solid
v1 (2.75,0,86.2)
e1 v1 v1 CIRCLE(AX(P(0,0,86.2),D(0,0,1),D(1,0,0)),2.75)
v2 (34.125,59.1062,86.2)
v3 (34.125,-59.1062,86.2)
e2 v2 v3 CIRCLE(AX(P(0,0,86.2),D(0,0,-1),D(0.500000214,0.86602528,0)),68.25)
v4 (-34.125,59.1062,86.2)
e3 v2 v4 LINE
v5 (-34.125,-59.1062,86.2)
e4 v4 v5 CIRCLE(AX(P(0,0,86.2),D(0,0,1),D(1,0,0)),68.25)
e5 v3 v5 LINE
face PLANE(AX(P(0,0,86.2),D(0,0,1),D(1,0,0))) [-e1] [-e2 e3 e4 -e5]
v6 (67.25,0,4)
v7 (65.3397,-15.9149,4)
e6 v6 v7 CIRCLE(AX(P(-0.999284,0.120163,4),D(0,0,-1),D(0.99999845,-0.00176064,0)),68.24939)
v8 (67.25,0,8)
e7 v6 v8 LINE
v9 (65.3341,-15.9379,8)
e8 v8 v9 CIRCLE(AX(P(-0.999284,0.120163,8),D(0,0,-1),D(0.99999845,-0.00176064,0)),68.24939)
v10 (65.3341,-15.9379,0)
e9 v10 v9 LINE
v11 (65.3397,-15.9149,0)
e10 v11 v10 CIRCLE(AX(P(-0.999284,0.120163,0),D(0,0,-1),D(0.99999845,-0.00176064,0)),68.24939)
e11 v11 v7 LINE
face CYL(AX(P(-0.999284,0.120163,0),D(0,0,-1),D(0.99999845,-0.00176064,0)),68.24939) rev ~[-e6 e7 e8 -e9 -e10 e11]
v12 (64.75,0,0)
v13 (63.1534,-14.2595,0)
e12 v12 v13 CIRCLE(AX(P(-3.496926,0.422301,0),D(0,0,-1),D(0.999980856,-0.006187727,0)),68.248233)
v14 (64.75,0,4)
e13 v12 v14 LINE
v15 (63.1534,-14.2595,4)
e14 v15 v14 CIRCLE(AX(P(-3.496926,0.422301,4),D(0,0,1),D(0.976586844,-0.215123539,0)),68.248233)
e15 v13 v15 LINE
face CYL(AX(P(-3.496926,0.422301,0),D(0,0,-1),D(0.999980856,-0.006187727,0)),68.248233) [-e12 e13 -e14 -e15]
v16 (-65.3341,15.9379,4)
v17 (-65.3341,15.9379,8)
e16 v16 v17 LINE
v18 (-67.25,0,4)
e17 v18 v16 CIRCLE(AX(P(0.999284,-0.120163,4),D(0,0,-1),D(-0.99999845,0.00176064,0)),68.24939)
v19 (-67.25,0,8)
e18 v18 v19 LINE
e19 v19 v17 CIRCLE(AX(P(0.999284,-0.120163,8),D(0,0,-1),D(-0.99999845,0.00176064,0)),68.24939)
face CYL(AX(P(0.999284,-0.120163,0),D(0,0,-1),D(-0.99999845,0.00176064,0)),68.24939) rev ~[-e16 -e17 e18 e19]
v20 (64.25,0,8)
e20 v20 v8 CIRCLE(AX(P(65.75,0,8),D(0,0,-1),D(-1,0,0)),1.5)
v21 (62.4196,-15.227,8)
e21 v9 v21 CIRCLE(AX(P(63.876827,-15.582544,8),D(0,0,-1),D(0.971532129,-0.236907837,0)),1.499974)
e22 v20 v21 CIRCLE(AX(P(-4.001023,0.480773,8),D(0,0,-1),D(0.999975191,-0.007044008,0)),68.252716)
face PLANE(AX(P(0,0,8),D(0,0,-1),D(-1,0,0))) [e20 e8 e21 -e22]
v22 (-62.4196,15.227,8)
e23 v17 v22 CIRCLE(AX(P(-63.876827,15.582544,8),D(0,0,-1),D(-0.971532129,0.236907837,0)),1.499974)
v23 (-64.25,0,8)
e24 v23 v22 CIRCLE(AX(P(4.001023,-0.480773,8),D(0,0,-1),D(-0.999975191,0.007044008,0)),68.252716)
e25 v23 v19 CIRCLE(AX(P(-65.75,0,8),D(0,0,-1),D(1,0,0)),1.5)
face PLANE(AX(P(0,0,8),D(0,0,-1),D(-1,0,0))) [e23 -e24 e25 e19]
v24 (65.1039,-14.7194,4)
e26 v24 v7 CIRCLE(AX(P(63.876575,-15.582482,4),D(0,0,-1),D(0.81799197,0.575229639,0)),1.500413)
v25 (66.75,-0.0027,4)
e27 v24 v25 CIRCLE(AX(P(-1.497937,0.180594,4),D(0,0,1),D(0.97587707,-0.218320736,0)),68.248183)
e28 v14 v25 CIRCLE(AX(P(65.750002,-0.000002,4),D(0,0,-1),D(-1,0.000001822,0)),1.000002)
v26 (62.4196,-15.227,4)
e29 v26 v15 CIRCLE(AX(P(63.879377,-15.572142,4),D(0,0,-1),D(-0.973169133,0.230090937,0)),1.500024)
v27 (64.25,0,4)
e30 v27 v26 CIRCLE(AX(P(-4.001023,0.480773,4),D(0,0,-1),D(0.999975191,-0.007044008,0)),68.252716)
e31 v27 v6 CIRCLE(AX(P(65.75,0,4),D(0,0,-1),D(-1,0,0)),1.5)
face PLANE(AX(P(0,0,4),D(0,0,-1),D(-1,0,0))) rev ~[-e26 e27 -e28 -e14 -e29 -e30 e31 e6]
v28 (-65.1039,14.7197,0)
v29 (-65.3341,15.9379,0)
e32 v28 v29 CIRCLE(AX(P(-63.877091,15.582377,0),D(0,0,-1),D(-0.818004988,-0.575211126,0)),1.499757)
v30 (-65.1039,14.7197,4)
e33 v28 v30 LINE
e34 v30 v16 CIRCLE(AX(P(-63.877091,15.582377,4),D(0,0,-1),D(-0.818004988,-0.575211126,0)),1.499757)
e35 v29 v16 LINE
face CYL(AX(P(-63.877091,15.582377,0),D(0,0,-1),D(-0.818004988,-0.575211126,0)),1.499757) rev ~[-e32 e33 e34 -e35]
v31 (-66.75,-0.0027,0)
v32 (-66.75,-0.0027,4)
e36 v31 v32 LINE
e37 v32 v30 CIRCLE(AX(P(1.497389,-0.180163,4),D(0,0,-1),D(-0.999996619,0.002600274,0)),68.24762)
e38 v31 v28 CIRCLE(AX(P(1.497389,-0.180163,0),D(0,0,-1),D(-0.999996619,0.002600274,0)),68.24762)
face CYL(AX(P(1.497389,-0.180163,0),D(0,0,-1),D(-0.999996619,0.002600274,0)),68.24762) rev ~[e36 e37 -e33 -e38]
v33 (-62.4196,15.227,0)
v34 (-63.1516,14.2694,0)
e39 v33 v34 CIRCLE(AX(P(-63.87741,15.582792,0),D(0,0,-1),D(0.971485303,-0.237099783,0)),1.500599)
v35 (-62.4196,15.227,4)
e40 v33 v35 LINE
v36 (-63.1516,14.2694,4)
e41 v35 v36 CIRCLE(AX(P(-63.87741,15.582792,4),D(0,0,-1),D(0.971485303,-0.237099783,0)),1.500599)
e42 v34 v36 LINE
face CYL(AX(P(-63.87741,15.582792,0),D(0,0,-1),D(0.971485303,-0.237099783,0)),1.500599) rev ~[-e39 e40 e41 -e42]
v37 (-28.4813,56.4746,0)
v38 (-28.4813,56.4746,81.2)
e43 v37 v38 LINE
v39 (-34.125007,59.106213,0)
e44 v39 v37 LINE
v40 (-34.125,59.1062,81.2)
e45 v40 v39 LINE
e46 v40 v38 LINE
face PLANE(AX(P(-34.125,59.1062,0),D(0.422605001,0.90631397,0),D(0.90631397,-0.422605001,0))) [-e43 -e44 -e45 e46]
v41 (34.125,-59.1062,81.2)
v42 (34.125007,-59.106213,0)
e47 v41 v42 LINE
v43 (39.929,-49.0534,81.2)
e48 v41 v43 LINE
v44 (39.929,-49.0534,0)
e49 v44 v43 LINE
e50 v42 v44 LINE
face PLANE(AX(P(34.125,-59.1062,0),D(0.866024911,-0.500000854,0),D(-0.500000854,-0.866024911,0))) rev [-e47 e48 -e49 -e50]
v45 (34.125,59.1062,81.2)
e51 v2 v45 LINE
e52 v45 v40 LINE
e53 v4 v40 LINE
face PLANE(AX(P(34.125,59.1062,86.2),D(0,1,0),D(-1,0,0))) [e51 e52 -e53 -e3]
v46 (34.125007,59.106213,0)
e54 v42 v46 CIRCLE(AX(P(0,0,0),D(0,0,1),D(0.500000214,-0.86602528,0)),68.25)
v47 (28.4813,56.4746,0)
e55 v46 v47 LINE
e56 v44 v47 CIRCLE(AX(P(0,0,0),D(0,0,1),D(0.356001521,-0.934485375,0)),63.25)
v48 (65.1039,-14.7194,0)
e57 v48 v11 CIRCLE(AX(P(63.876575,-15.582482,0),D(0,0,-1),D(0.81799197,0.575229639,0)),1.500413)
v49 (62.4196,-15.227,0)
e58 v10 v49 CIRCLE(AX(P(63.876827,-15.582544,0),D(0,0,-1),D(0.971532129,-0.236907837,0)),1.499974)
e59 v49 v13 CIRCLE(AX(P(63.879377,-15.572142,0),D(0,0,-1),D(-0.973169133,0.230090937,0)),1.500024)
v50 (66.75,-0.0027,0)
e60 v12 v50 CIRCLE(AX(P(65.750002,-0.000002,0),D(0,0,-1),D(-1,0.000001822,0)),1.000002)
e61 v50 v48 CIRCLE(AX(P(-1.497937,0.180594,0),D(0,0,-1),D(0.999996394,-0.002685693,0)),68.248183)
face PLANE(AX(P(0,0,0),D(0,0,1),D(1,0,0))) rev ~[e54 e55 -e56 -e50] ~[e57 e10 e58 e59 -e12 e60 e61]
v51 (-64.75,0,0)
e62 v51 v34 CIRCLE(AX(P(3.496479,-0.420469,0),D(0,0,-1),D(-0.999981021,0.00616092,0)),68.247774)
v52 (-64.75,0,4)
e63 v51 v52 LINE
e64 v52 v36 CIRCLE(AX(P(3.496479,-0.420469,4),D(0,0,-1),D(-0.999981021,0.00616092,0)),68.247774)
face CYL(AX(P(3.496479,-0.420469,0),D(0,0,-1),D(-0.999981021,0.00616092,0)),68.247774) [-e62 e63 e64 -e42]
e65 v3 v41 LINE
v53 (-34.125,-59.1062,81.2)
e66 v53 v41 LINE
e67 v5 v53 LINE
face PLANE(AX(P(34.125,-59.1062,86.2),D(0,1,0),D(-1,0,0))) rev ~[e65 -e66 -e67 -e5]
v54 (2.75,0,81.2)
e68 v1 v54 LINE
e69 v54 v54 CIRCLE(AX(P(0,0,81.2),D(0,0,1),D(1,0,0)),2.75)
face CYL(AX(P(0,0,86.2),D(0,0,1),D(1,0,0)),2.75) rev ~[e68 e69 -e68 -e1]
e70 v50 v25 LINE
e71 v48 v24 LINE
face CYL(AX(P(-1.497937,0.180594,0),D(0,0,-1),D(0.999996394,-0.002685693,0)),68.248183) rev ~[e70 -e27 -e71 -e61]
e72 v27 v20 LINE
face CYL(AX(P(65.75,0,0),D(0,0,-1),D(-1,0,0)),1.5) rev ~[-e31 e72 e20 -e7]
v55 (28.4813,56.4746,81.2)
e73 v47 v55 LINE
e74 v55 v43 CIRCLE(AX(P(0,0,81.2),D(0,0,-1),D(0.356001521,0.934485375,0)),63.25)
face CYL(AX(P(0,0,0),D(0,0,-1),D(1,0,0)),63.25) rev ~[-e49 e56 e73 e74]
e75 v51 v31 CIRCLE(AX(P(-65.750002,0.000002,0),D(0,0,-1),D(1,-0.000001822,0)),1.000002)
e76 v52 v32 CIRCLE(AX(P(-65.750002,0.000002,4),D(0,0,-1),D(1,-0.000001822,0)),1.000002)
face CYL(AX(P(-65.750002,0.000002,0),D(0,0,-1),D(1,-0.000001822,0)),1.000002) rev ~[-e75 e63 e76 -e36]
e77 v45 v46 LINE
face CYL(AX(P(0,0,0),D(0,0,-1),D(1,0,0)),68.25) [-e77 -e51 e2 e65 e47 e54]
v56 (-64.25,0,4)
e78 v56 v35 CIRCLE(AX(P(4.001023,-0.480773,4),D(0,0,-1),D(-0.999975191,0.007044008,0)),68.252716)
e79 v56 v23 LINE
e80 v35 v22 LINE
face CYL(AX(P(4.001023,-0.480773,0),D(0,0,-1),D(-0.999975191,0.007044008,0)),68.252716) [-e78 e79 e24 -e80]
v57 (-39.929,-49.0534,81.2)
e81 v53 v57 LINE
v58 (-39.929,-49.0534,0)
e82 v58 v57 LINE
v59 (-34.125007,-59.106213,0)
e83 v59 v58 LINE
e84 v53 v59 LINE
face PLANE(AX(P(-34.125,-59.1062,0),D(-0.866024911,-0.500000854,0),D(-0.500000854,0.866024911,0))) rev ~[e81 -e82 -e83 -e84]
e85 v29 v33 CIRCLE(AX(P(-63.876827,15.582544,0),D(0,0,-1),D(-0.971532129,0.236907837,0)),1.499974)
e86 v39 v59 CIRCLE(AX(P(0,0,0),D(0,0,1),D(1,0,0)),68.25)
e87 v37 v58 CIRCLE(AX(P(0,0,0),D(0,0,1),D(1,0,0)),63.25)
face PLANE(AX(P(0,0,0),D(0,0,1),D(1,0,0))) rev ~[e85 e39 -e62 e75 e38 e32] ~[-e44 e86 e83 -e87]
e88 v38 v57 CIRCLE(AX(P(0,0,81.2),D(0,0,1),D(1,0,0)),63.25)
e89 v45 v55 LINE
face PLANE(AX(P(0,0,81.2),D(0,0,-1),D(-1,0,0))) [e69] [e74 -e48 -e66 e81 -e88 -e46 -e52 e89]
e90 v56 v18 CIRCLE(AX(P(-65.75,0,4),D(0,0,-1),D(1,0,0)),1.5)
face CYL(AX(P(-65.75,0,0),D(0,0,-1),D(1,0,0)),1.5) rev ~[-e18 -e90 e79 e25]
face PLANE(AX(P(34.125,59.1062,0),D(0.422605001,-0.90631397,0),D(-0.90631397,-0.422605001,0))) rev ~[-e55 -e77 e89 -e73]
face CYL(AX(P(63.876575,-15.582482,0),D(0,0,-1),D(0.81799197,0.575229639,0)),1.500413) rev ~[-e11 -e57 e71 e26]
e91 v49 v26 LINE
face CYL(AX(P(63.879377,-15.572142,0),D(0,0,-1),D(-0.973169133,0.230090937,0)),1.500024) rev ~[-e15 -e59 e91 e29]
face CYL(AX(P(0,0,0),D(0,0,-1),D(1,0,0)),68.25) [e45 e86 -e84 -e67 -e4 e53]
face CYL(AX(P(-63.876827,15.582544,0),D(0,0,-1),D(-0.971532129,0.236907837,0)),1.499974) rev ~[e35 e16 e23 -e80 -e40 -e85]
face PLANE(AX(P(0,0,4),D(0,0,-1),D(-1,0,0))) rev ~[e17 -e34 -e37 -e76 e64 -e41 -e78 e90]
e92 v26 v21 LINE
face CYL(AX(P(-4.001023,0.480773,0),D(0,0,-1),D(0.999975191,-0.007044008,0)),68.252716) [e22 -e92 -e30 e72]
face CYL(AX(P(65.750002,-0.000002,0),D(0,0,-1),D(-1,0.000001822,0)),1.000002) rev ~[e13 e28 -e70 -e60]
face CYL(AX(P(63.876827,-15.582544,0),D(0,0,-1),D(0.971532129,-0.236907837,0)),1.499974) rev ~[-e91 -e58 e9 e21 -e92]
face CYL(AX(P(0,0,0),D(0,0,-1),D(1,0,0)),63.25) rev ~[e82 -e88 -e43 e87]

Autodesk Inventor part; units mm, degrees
ref_plane "YZ Plane" through (0, 0, 0) normal (1, 0, 0) x (0, 1, 0)
ref_plane "XZ Plane" through (0, 0, 0) normal (0, 1, 0) x (-1, 0, 0)
ref_plane "XY Plane" through (0, 0, 0) normal (0, 0, 1) x (1, 0, 0)
sketch "Sketch1" plane through (0, 0, 0) normal (0, 0, 1) x (1, 0, 0)
  circle A0 centre (0, 0) radius 63.25
  circle A1 centre (0, 0) radius 68.25
  dimension "d0" = 126.5
  dimension "d1" = 5
extrude "Extrusion1" add sketch "Sketch1" along normal blind 81.2
sketch "Sketch2" plane through (0, 0, 81.2) normal (0, 0, 1) x (1, 0, 0)
  circle A0 centre (0, 0) radius 68.25
extrude "Extrusion2" add sketch "Sketch2" along normal blind 5
sketch "Sketch3" plane through (0, 0, 86.2) normal (0, 0, 1) x (1, 0, 0)
  circle A0 centre (0, 0) radius 2.75
  dimension "d6" = 5.5
extrude "Extrusion3" cut sketch "Sketch3" against normal blind 5
sketch "Sketch4" plane through (0, 0, 86.2) normal (0, 0, 1) x (1, 0, 0)
  line L0 (0, 0) -> (-34.125, 59.1062)
  circle A0 centre (0, 0) radius 68.25 projected
  line L1 (0, 0) -> (68.25, 0) construction
  circle A1 centre (0, 0) radius 2.75 projected
  line L2 (0, 0) -> (34.125, 59.1062)
  line L3 (34.125, 59.1062) -> (-34.125, 59.1062)
  line L4 (0, 0) -> (-34.125, -59.1062)
  circle A2 centre (0, 0) radius 68.25 projected
  line L5 (0, 0) -> (68.25, 0) construction
  line L6 (0, 0) -> (34.125, -59.1062)
  line L7 (0, 0) -> (68.25, 0) construction
  line L8 (34.125, -59.1062) -> (-34.125, -59.1062)
  dimension "d9" = 120
  dimension "d15" = 120
  dimension "d16" = 60
extrude "Extrusion4" cut sketch "Sketch4" against normal through all contours A0 L3 | L8 A0
sketch "Sketch5" plane through (0, 0, 0) normal (0, 0, -1) x (-1, 0, 0)
  line L0 (-34.125, 59.1062) -> (34.125, 59.1062) projected
  line L1 (34.125, 59.1062) -> (28.4813, 56.4746)
  arc A0 (-22.517, 59.1062) -> (22.517, 59.1062) centre (0, 0) ccw projected
  line L2 (34.125, 59.1062) -> (40.3521, 59.1062) construction
  line L3 (0, 0) -> (0, 13.3987)
  line L4 (-34.125, 59.1062) -> (-28.4813, 56.4746)
  arc A1 (-22.517, 59.1062) -> (-28.4813, 56.4746) centre (0, 0) ccw
  line L5 (-34.125, 59.1062) -> (-22.517, 59.1062)
  dimension "d12" = 155
extrude "Extrusion5" cut sketch "Sketch5" against normal blind 81.2 contours L0 A0 L4 | L0 L1 A0
sketch "Sketch6" plane through (-34.125, 59.1062, 86.2) normal (0, 1, 0) x (1, 0, 0)
  point P0 (34.125, 86.2)
sketch "Sketch7" plane through (0, 0, 0) normal (0, 0, -1) x (-1, 0, 0)
  arc A0 (34.125, -59.1062) -> (34.125, 59.1062) centre (0, 0) ccw projected
  line L0 (34.125, 59.1062) -> (28.4813, 56.4746) projected
  arc A1 (22.517, -59.1062) -> (28.4813, 56.4746) centre (0, 0) ccw projected
  line L1 (22.517, -59.1062) -> (34.125, -59.1062) projected
  arc A2 (34.125, -59.1062) -> (34.125, 59.1062) centre (0, 0) ccw projected
  line L2 (-28.4813, 56.4746) -> (-34.125, 59.1062) projected
  arc A3 (-34.125, 59.1062) -> (-34.125, -59.1062) centre (0, 0) ccw projected
  line L3 (-34.125, -59.1062) -> (-22.517, -59.1062) projected
  arc A4 (-28.4813, 56.4746) -> (-22.517, -59.1062) centre (0, 0) ccw projected
  line L4 (22.517, -59.1062) -> (34.125, -59.1062) projected
  line L5 (34.125, -59.1062) -> (39.929, -49.0534)
  arc A5 (22.517, -59.1062) -> (28.4813, 56.4746) centre (0, 0) ccw projected
  line L6 (34.125, -59.1062) -> (45.733, -59.1062) construction
  circle A6 centre (0, 0) radius 2.75 projected
  line L7 (0, 0) -> (0, -7.8217)
  line L8 (-34.125, -59.1062) -> (-39.929, -49.0534)
  line L9 (34.125, -59.1062) -> (22.517, -59.1062)
  arc A7 (22.517, -59.1062) -> (39.929, -49.0534) centre (0, 0) ccw
  line L10 (34.125, -59.1062) -> (39.929, -49.0534)
  dimension "d17" = 60
extrude "Extrusion6" cut sketch "Sketch7" against normal blind 81.2 contours L1 A1 L5
mirror "Mirror1" about plane through (0, 0, 0) normal (1, 0, 0) of "Extrusion6"
sketch "Sketch8" plane through (0, 0, 0) normal (0, 0, -1) x (-1, 0, 0)
  arc A0 (39.929, -49.0534) -> (28.4813, 56.4746) centre (0, 0) ccw projected
  line L0 (63.25, 0) -> (68.25, 0)
  arc A1 (34.125, -59.1062) -> (34.125, 59.1062) centre (0, 0) ccw projected
  arc A2 (64.25, 0) -> (67.25, 0) centre (65.75, 0) ccw
  line L1 (61.4481, 14.99) -> (66.3056, 16.1749)
  arc A3 (65.3341, 15.9379) -> (62.4196, 15.227) centre (63.8768, 15.5825) ccw
  arc A4 (67.25, 0) -> (65.3341, 15.9379) centre (-0.9999, -0.1202) ccw
  arc A5 (64.25, 0) -> (62.4196, 15.227) centre (-3.9983, -0.4806) ccw
  line L2 (0, 0) -> (0, 7.6651)
  line L3 (0, 0) -> (-11.2866, 0)
  arc A6 (-64.25, 0) -> (-62.4196, -15.227) centre (3.9983, 0.4806) ccw
  arc A7 (-65.3341, -15.9379) -> (-62.4196, -15.227) centre (-63.8768, -15.5825) ccw
  arc A8 (-67.25, 0) -> (-65.3341, -15.9379) centre (0.9999, 0.1202) ccw
  arc A9 (-64.25, 0) -> (-67.25, 0) centre (-65.75, 0) ccw
  dimension "d20" = 3
  dimension "d21" = 5
  dimension "d22" = 3
  dimension "d23" = 68.25
  dimension "d24" = 68.25
extrude "Extrusion7" cut sketch "Sketch8" against normal blind 8 contours A5 L1 A4 L0 | L0 A2 | A3 L1 | A6 A7 A8 A9
sketch "Sketch9" plane through (0, 0, 0) normal (0, 0, -1) x (-1, 0, 0)
  arc A0 (64.25, 0) -> (67.25, 0) centre (65.75, 0) ccw projected
  arc A1 (64.75, 0) -> (66.75, -0.0027) centre (65.75, 0) ccw
  arc A2 (64.8496, 15.8142) -> (64.8483, 15.8195) centre (63.8768, 15.5825) ccw
  arc A3 (64.75, 0) -> (63.1516, 14.2694) centre (-3.4987, -0.4206) ccw
  line L0 (0, 0) -> (0, 7.6651) projected
  circle A4 centre (0, 0) radius 2.75 projected
  line L1 (34.125, -59.1062) -> (-34.125, -59.1062) projected
  line L2 (39.929, -49.0534) -> (34.125, -59.1062) projected
  arc A5 (39.929, -49.0534) -> (28.4813, 56.4746) centre (0, 0) ccw projected
  line L3 (34.125, 59.1062) -> (28.4813, 56.4746) projected
  line L4 (-34.125, 59.1062) -> (34.125, 59.1062) projected
  line L5 (-28.4813, 56.4746) -> (-34.125, 59.1062) projected
  arc A6 (-28.4813, 56.4746) -> (-39.929, -49.0534) centre (0, 0) ccw projected
  line L6 (-39.929, -49.0534) -> (-34.125, -59.1062) projected
  line L7 (0, 0) -> (-11.2866, 0) projected
  arc A7 (64.25, 0) -> (62.4196, 15.227) centre (-3.9983, -0.4806) ccw projected
  arc A8 (67.25, 0) -> (65.3341, 15.9379) centre (-0.9999, -0.1202) ccw projected
  arc A9 (64.25, 0) -> (67.25, 0) centre (65.75, 0) ccw projected
  arc A10 (-64.75, 0) -> (-66.75, -0.0027) centre (-65.75, 0) ccw
  arc A11 (-65.1039, -14.7194) -> (-65.3397, -15.9149) centre (-63.877, -15.5823) ccw
  arc A12 (-64.849, -15.8165) -> (-64.849, -15.8165) centre (-63.8765, -15.5834) ccw
  arc A13 (-64.25, 0) -> (-62.4196, -15.227) centre (3.9983, 0.4806) ccw
  arc A14 (-64.75, 0) -> (-63.1534, -14.2595) centre (3.4986, 0.4224) ccw
  arc A15 (-66.75, -0.0027) -> (-65.1039, -14.7194) centre (1.4998, 0.1807) ccw
  arc A16 (-67.25, 0) -> (-65.3341, -15.9379) centre (0.9999, 0.1202) ccw
  arc A17 (-64.25, 0) -> (-67.25, 0) centre (-65.75, 0) ccw
  arc A18 (-64.75, 0) -> (-66.75, -0.0027) centre (-65.75, 0) ccw
  arc A19 (66.75, -0.0027) -> (65.1039, 14.7197) centre (-1.4998, -0.1803) ccw
  arc A20 (64.8496, 15.8142) -> (64.8483, 15.8195) centre (-1.4998, -0.1803) ccw
  arc A21 (-67.25, 0) -> (-66.7377, -1.1289) centre (-65.75, 0) ccw
  arc A22 (-64.7342, -1.1037) -> (-64.25, 0) centre (-65.75, 0) ccw
  arc A23 (65.1039, 14.7197) -> (65.3341, 15.9379) centre (63.8768, 15.5825) ccw
  arc A24 (62.4196, 15.227) -> (63.1516, 14.2694) centre (63.8768, 15.5825) ccw
  arc A25 (-65.3341, -15.9379) -> (-65.3341, -15.9379) centre (-63.877, -15.5823) ccw
  arc A26 (-62.4196, -15.227) -> (-63.1534, -14.2595) centre (-63.8795, -15.5722) ccw
  point P0 (65.3341, 15.9379)
  dimension "d28" = 2
  dimension "d30" = 68.25
extrude "Extrusion8" add sketch "Sketch9" against normal blind 4 contours A7 A24 A3 A1 A19 A23 A8 A0 | A21 A15 A11 A16 | A10 A15 A21 A17 A22 A14 | A22 A13 A26 A14
sketch "Sketch10" plane through (0, 0, 81.2) normal (0, 0, -1) x (-1, 0, 0)
  point P0 (0, 0)
sketch "Sketch11" plane through (0, 0, 81.2) normal (0, 0, -1) x (-1, 0, 0)
  arc A0 (-65.3397, -15.9149) -> (-65.3341, -15.9379) centre (0.9999, 0.1202) ccw projected
  arc A1 (-65.1039, -14.7194) -> (-65.3397, -15.9149) centre (-63.877, -15.5823) ccw projected
  arc A2 (-66.75, -0.0027) -> (-65.1039, -14.7194) centre (1.4998, 0.1807) ccw projected
  arc A3 (-64.75, 0) -> (-66.75, -0.0027) centre (-65.75, 0) ccw projected
  arc A4 (-64.75, 0) -> (-63.1534, -14.2595) centre (3.4986, 0.4224) ccw projected
  arc A5 (-62.4196, -15.227) -> (-63.1534, -14.2595) centre (-63.8795, -15.5722) ccw projected
  arc A6 (-65.3341, -15.9379) -> (-62.4196, -15.227) centre (-63.8768, -15.5825) ccw projected
  line L0 (-34.125, -59.1062) -> (-39.929, -49.0534) projected
  arc A7 (-28.4813, 56.4746) -> (-39.929, -49.0534) centre (0, 0) ccw projected
  line L1 (-28.4813, 56.4746) -> (-34.125, 59.1062) projected
  arc A8 (-34.125, 59.1062) -> (-34.125, -59.1062) centre (0, 0) ccw projected
  arc A9 (65.1039, 14.7197) -> (63.1516, 14.2694) centre (63.8768, 15.5825) ccw projected
  arc A10 (66.75, -0.0027) -> (65.1039, 14.7197) centre (-1.4998, -0.1803) ccw projected
  arc A11 (64.75, 0) -> (66.75, -0.0027) centre (65.75, 0) ccw projected
  arc A12 (64.75, 0) -> (63.1516, 14.2694) centre (-3.4987, -0.4206) ccw projected
  line L2 (39.929, -49.0534) -> (34.125, -59.1062) projected
  arc A13 (34.125, -59.1062) -> (34.125, 59.1062) centre (0, 0) ccw projected
  line L3 (34.125, 59.1062) -> (28.4813, 56.4746) projected
  arc A14 (39.929, -49.0534) -> (28.4813, 56.4746) centre (0, 0) ccw projected
  circle A15 centre (0, 0) radius 2.75 projected
  line L4 (0, 0) -> (65.75, 0)
  line L5 (0, 0) -> (63.8768, 15.5825)
properties part number "Gear Container V2"
